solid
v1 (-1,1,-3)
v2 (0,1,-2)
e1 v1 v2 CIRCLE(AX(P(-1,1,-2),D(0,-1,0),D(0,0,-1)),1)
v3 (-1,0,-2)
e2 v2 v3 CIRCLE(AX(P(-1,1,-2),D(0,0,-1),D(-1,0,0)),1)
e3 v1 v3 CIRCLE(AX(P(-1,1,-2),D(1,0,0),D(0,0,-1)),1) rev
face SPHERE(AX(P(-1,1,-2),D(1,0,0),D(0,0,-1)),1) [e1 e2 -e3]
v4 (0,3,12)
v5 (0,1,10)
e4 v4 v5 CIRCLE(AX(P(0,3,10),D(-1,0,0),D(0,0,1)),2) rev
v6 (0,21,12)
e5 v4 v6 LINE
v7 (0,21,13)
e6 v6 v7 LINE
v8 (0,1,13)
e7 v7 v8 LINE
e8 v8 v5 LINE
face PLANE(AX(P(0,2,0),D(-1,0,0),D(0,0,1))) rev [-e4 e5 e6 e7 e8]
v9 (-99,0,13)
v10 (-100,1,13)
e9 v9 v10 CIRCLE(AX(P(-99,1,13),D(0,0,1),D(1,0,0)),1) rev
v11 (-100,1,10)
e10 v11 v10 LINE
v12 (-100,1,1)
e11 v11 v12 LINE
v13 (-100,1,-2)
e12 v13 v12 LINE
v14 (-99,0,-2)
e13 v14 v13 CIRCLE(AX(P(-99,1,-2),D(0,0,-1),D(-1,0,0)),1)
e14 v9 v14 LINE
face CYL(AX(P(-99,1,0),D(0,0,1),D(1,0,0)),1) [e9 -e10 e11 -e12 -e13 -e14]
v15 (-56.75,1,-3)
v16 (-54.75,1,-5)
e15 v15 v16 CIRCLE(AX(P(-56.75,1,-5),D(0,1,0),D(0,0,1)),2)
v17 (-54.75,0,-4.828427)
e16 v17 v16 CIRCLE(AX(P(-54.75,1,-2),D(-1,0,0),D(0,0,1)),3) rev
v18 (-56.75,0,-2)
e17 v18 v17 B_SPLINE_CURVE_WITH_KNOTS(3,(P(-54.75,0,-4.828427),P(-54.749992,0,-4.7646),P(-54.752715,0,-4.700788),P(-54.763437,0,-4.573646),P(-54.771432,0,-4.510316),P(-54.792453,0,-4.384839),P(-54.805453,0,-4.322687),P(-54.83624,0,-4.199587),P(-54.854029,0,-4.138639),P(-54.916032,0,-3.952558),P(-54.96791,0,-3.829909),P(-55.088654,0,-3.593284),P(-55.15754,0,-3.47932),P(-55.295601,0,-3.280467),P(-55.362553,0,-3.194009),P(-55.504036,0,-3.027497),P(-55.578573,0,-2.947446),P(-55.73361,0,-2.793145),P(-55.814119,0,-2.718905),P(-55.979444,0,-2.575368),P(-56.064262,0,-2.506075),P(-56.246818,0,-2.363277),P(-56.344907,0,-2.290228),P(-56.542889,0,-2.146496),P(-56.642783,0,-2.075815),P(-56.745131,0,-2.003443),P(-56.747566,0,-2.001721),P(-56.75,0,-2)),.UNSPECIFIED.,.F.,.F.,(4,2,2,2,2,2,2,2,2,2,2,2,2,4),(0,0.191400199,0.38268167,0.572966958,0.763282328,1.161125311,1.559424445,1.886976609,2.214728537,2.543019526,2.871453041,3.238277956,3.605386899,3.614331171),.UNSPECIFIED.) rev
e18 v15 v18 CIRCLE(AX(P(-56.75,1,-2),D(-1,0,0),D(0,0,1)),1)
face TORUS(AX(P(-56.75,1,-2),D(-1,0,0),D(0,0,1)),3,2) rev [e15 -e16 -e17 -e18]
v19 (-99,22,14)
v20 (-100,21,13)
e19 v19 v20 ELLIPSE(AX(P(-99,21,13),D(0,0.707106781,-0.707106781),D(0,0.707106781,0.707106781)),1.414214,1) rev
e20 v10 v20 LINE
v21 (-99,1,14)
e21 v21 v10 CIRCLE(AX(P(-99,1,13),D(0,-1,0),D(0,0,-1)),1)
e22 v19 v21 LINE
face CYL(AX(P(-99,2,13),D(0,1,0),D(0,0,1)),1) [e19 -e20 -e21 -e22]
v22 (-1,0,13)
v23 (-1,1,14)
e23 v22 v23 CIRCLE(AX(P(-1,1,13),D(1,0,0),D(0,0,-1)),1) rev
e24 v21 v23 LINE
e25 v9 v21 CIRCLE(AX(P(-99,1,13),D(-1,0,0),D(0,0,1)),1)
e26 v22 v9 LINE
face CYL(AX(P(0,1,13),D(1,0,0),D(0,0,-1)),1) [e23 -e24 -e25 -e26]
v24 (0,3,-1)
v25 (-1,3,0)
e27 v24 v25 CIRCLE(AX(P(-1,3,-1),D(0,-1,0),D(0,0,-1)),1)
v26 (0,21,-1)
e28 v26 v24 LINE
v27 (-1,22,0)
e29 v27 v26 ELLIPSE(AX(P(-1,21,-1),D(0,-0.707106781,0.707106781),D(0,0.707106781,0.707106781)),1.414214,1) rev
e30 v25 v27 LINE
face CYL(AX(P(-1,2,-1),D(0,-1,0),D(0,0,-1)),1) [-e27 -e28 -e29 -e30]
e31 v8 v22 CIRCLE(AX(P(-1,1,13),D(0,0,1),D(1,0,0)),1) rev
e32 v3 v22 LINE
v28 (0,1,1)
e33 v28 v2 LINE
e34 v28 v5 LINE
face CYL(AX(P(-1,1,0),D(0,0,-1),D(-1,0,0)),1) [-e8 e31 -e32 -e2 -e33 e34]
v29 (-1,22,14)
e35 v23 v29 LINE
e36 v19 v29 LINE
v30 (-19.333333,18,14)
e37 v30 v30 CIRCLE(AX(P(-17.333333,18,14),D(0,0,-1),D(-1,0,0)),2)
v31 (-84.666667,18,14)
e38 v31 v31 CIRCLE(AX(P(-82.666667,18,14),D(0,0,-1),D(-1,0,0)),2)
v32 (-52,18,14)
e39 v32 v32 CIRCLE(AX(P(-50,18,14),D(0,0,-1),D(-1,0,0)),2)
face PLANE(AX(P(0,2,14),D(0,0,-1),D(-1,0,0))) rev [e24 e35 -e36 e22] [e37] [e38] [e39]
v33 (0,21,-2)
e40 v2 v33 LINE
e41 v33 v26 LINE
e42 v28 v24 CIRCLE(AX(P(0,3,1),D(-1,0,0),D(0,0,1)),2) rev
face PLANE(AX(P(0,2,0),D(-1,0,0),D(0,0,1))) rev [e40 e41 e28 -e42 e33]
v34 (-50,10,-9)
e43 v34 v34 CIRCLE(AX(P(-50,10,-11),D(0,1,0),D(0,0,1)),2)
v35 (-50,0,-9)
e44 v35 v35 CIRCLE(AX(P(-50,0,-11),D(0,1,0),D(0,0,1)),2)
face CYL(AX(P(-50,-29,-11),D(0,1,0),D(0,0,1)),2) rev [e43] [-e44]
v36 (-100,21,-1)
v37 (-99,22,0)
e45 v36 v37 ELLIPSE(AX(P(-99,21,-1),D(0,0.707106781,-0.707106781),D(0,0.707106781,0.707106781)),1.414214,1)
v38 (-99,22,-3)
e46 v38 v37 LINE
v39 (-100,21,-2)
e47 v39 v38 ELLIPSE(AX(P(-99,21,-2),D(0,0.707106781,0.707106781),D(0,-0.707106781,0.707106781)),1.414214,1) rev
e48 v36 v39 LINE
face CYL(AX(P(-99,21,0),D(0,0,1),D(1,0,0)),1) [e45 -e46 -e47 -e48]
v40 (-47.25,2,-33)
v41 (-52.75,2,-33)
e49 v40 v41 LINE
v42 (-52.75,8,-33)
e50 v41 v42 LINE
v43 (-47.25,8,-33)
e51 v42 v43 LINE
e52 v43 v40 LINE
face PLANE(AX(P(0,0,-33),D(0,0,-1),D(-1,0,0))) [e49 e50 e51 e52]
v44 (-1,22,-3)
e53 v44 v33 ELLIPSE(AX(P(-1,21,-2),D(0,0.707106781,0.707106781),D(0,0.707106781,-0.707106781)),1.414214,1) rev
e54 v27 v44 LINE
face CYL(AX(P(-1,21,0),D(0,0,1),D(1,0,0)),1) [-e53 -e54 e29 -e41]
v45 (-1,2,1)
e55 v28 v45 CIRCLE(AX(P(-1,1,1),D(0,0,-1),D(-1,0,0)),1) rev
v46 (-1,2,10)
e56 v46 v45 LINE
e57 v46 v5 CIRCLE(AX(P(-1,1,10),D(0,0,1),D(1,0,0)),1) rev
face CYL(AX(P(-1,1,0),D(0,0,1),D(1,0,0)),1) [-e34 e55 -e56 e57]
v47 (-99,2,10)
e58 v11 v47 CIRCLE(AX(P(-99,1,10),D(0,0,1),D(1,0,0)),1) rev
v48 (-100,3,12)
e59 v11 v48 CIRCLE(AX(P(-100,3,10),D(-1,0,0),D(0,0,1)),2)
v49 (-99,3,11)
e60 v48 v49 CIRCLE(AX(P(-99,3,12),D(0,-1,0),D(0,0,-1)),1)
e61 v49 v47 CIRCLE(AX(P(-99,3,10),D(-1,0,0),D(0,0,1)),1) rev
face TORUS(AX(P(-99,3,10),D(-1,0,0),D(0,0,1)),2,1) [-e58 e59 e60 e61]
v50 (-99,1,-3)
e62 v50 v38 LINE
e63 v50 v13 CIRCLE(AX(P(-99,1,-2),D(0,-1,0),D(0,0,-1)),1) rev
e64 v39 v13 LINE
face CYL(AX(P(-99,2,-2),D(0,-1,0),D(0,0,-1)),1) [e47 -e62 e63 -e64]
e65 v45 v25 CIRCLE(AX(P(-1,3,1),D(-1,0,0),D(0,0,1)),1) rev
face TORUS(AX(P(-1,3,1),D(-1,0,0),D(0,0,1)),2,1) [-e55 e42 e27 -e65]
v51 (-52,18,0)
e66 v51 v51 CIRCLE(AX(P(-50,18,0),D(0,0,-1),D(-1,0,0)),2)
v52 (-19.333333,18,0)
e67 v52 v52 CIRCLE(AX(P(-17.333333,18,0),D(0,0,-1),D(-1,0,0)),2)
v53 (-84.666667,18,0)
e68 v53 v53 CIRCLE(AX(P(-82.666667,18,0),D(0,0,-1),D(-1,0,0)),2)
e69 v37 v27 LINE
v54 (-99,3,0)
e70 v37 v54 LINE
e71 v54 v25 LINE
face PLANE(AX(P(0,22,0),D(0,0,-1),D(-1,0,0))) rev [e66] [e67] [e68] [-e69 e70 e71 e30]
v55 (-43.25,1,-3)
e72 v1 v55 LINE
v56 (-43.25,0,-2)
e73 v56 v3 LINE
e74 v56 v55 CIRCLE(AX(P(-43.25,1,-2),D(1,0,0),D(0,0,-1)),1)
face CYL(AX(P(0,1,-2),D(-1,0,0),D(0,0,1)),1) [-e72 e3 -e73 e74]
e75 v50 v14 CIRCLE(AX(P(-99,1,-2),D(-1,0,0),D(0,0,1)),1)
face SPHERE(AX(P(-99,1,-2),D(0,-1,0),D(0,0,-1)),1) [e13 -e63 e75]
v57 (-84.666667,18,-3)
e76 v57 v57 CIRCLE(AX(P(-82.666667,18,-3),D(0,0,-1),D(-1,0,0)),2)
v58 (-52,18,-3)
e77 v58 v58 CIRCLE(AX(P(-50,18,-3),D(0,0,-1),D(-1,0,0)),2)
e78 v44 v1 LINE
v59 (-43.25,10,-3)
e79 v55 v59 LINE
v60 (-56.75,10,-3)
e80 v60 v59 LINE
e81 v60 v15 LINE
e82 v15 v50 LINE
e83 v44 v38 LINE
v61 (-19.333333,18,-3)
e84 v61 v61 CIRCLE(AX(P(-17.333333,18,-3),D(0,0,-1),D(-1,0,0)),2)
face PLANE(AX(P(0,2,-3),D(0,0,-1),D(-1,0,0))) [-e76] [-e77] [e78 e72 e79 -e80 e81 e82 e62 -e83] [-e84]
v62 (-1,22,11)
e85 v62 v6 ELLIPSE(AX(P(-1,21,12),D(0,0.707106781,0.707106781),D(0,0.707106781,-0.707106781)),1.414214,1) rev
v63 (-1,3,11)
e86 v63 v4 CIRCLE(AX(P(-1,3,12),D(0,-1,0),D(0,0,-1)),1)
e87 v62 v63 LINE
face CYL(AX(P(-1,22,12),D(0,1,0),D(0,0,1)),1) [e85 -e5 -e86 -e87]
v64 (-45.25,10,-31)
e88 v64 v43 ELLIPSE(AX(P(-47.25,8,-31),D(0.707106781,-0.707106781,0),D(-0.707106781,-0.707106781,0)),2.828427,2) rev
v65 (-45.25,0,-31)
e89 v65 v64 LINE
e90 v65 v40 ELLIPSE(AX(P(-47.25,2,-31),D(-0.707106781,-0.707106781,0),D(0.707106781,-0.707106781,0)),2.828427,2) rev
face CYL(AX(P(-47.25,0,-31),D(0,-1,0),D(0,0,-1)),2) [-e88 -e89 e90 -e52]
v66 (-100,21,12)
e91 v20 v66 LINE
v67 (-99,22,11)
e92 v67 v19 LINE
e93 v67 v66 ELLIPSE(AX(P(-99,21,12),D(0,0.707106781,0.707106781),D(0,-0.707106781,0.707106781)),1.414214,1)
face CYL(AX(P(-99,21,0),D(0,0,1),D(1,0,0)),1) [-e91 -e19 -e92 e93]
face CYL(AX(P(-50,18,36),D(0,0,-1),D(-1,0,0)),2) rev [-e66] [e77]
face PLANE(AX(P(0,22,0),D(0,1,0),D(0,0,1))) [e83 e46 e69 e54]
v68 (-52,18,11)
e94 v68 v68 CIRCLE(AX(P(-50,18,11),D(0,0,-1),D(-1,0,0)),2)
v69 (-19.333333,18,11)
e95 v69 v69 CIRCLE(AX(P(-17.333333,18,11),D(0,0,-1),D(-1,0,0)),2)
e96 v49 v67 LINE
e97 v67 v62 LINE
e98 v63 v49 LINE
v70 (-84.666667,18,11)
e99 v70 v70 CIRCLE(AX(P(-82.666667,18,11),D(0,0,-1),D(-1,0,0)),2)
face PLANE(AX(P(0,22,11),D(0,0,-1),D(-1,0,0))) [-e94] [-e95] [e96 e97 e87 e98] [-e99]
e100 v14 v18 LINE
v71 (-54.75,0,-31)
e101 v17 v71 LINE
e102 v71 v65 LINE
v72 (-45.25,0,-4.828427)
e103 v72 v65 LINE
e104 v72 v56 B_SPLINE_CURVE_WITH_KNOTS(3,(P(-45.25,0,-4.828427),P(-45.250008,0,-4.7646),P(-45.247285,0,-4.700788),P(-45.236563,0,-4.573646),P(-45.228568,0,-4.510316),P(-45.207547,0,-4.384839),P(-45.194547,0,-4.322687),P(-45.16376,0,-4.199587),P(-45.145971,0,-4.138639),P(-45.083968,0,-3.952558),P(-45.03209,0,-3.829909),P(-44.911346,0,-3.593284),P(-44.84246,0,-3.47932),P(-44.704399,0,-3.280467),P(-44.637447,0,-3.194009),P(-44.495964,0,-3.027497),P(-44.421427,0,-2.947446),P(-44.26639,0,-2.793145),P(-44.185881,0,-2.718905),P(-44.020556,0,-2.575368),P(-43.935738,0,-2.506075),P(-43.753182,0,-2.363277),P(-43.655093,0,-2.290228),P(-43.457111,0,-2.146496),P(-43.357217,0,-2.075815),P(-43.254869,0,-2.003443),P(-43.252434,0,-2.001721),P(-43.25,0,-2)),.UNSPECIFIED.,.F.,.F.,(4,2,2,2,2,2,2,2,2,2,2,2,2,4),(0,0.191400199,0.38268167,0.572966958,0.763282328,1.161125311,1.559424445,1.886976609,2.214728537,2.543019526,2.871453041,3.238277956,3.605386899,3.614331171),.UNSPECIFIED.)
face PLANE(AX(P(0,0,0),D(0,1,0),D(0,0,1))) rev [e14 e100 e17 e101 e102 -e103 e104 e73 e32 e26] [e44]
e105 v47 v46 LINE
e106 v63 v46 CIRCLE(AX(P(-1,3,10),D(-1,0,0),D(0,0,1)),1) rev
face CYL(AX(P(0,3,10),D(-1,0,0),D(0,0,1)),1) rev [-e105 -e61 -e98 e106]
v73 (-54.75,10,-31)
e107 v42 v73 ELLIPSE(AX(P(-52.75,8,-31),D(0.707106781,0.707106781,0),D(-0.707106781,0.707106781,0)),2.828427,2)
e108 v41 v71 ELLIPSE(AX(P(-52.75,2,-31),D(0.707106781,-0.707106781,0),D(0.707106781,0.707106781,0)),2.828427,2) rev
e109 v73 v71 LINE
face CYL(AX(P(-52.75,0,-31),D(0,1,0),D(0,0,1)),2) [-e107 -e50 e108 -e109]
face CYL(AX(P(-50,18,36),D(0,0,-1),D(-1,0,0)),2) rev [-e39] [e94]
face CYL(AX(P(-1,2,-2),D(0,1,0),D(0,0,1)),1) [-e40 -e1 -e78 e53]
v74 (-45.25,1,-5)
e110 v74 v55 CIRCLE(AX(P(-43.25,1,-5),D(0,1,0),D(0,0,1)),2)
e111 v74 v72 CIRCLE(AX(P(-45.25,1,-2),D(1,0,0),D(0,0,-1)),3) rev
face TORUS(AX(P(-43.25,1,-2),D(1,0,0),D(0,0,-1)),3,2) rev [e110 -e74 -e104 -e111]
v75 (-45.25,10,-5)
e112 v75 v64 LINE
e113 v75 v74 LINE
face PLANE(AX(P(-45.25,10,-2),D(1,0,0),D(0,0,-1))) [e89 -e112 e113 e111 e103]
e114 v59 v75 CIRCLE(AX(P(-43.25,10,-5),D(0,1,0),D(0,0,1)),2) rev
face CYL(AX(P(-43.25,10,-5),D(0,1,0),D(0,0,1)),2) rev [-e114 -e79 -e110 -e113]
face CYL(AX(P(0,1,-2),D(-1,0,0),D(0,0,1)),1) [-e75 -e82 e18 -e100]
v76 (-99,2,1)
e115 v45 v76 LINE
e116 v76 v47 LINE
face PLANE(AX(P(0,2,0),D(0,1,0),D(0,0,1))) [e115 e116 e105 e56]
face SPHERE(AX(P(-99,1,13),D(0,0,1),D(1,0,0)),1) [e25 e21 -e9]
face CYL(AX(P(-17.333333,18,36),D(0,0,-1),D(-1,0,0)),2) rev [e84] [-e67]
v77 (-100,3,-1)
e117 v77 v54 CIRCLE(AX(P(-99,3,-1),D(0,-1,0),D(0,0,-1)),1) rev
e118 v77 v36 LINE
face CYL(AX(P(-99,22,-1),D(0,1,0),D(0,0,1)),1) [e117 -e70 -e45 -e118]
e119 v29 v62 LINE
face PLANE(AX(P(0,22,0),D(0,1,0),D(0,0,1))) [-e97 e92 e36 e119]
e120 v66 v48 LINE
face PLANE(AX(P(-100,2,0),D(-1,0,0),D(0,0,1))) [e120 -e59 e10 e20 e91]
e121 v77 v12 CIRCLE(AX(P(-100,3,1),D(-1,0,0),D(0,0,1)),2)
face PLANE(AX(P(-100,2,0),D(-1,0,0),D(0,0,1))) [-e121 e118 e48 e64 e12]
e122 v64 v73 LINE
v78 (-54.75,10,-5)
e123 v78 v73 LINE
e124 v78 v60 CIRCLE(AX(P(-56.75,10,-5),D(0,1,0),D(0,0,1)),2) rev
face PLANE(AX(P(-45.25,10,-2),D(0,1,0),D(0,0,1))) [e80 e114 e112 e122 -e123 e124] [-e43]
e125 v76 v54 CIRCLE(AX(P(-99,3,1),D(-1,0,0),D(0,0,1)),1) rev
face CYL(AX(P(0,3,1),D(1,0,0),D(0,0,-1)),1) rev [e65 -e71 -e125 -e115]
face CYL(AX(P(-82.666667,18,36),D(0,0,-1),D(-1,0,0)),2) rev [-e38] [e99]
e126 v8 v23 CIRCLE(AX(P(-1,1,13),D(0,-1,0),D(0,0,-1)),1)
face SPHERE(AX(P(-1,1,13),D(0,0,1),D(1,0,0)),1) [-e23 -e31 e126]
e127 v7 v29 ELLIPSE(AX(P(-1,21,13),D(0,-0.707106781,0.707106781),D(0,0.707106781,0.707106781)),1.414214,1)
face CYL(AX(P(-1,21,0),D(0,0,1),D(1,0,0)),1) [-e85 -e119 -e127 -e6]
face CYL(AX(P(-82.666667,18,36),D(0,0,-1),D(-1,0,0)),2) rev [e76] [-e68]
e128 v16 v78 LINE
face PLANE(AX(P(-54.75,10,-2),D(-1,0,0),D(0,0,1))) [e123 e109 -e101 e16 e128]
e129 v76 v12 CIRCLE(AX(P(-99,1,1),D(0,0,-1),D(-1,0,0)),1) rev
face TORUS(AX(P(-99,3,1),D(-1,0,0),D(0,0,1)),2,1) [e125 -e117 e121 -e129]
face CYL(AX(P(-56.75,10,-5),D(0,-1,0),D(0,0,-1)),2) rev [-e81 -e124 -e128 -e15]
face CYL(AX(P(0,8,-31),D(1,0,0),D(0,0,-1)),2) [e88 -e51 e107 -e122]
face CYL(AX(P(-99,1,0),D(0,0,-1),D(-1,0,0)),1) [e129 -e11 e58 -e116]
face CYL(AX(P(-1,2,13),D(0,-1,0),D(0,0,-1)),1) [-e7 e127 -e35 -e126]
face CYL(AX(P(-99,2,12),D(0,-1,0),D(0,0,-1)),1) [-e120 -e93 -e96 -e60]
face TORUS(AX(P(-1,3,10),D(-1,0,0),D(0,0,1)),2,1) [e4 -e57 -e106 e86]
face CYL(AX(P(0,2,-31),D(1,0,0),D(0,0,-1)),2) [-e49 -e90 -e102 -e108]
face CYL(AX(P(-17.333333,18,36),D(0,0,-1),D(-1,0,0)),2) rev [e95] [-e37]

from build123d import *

# Parameters (mm, degrees)
SKETCH2_W                = 100
SKETCH2_H                = 3
SKETCH2_H_2              = 11
BOSS_EXTRUDE2_DEPTH      = 2
SKETCH3_W                = 100
SKETCH3_H                = 3
BOSS_EXTRUDE3_DEPTH      = 20
FILLET2_R                = 1
BOSS_EXTRUDE5_DEPTH      = 30
BOSS_EXTRUDE5_DEPTH_BACK = 1
SKETCH5_W                = 9.5
SKETCH5_H                = 10
FILLET3_R                = 2
FILLET4_R                = 2
SKETCH6_R                = 2
CUT_EXTRUDE1_DEPTH       = 39
SKETCH7_R                = 2
CUT_EXTRUDE2_DEPTH       = 39


# Some blends are built 0.0001 mm under size
with BuildPart() as part:
    # Sketch2 → Boss-Extrude2 (new body)
    with BuildSketch(Plane(origin=(0, 0, 0), x_dir=(1, 0, 0), z_dir=(0, 1, 0))):
        with Locations((-50, 1.5)):
            Rectangle(SKETCH2_W, SKETCH2_H)
        with Locations((-50, -5.5)):
            Rectangle(SKETCH2_W, SKETCH2_H_2)
        with Locations((-50, -12.5)):
            Rectangle(SKETCH2_W, SKETCH2_H)
    extrude(amount=BOSS_EXTRUDE2_DEPTH)

    # Sketch3 → Boss-Extrude3 (add)
    with BuildSketch(Plane(origin=(0, 2, 0), x_dir=(1, 0, 0), z_dir=(0, 1, 0))):
        with Locations((-50, -12.5)):
            Rectangle(SKETCH3_W, SKETCH3_H)
        with Locations((-50, 1.5)):
            Rectangle(SKETCH3_W, SKETCH3_H)
    extrude(amount=BOSS_EXTRUDE3_DEPTH)

    # Fillet2
    fillet2_edges = [part.edges().sort_by_distance(p)[0] for p in [
        (-100, 11, -3),
        (0, 11, -3),
        (0, 11, 14),
        (-100, 11, 14),
        (-100, 2, 5.5),
        (0, 2, 5.5),
        (0, 12, 11),
        (-100, 12, 11),
        (-100, 22, 12.5),
        (0, 22, 12.5),
        (-50, 2, 11),
        (-50, 2, 0),
        (-100, 12, 0),
        (0, 12, 0),
        (-100, 22, -1.5),
        (0, 22, -1.5),
        (-50, 0, -3),
        (0, 0, 5.5),
        (-50, 0, 14),
        (-100, 0, 5.5),
    ]]
    fillet(fillet2_edges, radius=FILLET2_R - 0.0001)  # a hair under: the kernel refuses the full size

    # Sketch5 → Boss-Extrude5 (add, two sides: drawn at the far end of the back side and taken through both)
    with BuildSketch(Plane(origin=(0, 0, -3), x_dir=(-1, 0, 0), z_dir=(0, 0, -1)).offset(-BOSS_EXTRUDE5_DEPTH_BACK)):
        with Locations((50, 5)):
            Rectangle(SKETCH5_W, SKETCH5_H)
    extrude(amount=BOSS_EXTRUDE5_DEPTH + BOSS_EXTRUDE5_DEPTH_BACK)

    # Fillet3
    fillet3_edges = [part.edges().sort_by_distance(p)[0] for p in [
        (-45.25, 5, -33),
        (-50, 0, -33),
        (-54.75, 5, -33),
        (-50, 10, -33),
    ]]
    fillet(fillet3_edges, radius=FILLET3_R)

    # Fillet4
    # the kernel refuses this fillet: 2 mm, written as the material it adds along each edge
    with BuildSketch(Plane(origin=(-54.75, 0.9999, -2.0001), x_dir=(0, 0.0062831439655585564, -0.9999802608561371), z_dir=(0, -0.9999802608561371, -0.0062831439655585564))) as fillet4_piece_1_section:
        with BuildLine():
            CenterArc((-0.9999 - FILLET4_R, -FILLET4_R), FILLET4_R, 0, 90)
            Line((-0.9999, -FILLET4_R), (-0.9999, 0))
            Line((-0.9999, 0), (-0.9999 - FILLET4_R, 0))
        make_face()
    fillet4_piece_1 = revolve(axis=Axis((-54.75, 0.9999, -2.0001), (1, 0, 0)), revolution_arc=359.64, mode=Mode.PRIVATE)
    fillet4_piece_1 = split(fillet4_piece_1, bisect_by=Plane(origin=(-55.461006322, 0, -2.760267515), z_dir=(0, 1, 0)), keep=Keep.TOP, mode=Mode.PRIVATE)
    fillet4_piece_1 = split(fillet4_piece_1, bisect_by=Plane(origin=(-55.461006322, 0.239732481, 0), z_dir=(0, 0, -1)), keep=Keep.TOP, mode=Mode.PRIVATE)
    add(fillet4_piece_1)
    with BuildSketch(Plane(origin=(-45.25, 0.9999, -2.0001), x_dir=(0, 0.0062831439655585564, -0.9999802608561371), z_dir=(0, -0.9999802608561371, -0.0062831439655585564))) as fillet4_piece_2_section:
        with BuildLine():
            CenterArc((-0.9999 - FILLET4_R, FILLET4_R), FILLET4_R, 270, 90)
            Line((-0.9999, FILLET4_R), (-0.9999, 0))
            Line((-0.9999, 0), (-0.9999 - FILLET4_R, 0))
        make_face()
    fillet4_piece_2 = revolve(axis=Axis((-45.25, 0.9999, -2.0001), (1, 0, 0)), revolution_arc=359.64, mode=Mode.PRIVATE)
    fillet4_piece_2 = split(fillet4_piece_2, bisect_by=Plane(origin=(-44.538993678, 0, -2.760267519), z_dir=(0, 1, 0)), keep=Keep.TOP, mode=Mode.PRIVATE)
    fillet4_piece_2 = split(fillet4_piece_2, bisect_by=Plane(origin=(-44.538993678, 0.239732485, 0), z_dir=(0, 0, -1)), keep=Keep.TOP, mode=Mode.PRIVATE)
    add(fillet4_piece_2)
    with BuildSketch(Plane(origin=(-45.25, 10, -3), x_dir=(0, 0, -1), z_dir=(0, -1, 0)), Plane(origin=(-54.75, 0.9999, -3), x_dir=(0, 0, -1), z_dir=(0, 1, 0))) as fillet4_piece_3:
        with BuildLine():
            CenterArc((FILLET4_R, FILLET4_R), FILLET4_R, 180, 90)
            Line((0, FILLET4_R), (0, 0))
            Line((0, 0), (FILLET4_R, 0))
        make_face()
    extrude(amount=9.0001)

    # Sketch6 → Cut-Extrude1 (cut)
    with BuildSketch(Plane(origin=(0, 0, -3), x_dir=(-1, 0, 0), z_dir=(0, 0, -1))):
        with Locations((17.333333335, 18)):
            Circle(SKETCH6_R)
        with Locations((50.000000335, 18)):
            Circle(SKETCH6_R)
        with Locations((82.666667335, 18)):
            Circle(SKETCH6_R)
    extrude(amount=-CUT_EXTRUDE1_DEPTH, mode=Mode.SUBTRACT)

    # Sketch7 → Cut-Extrude2 (cut)
    with BuildSketch(Plane(origin=(0, 10, 0), x_dir=(1, 0, 0), z_dir=(0, 1, 0))):
        with Locations(Location((-50, 11, 0), (0, 0, 270))):
            Circle(SKETCH7_R)
    extrude(amount=-CUT_EXTRUDE2_DEPTH, mode=Mode.SUBTRACT)


solid = part.part
